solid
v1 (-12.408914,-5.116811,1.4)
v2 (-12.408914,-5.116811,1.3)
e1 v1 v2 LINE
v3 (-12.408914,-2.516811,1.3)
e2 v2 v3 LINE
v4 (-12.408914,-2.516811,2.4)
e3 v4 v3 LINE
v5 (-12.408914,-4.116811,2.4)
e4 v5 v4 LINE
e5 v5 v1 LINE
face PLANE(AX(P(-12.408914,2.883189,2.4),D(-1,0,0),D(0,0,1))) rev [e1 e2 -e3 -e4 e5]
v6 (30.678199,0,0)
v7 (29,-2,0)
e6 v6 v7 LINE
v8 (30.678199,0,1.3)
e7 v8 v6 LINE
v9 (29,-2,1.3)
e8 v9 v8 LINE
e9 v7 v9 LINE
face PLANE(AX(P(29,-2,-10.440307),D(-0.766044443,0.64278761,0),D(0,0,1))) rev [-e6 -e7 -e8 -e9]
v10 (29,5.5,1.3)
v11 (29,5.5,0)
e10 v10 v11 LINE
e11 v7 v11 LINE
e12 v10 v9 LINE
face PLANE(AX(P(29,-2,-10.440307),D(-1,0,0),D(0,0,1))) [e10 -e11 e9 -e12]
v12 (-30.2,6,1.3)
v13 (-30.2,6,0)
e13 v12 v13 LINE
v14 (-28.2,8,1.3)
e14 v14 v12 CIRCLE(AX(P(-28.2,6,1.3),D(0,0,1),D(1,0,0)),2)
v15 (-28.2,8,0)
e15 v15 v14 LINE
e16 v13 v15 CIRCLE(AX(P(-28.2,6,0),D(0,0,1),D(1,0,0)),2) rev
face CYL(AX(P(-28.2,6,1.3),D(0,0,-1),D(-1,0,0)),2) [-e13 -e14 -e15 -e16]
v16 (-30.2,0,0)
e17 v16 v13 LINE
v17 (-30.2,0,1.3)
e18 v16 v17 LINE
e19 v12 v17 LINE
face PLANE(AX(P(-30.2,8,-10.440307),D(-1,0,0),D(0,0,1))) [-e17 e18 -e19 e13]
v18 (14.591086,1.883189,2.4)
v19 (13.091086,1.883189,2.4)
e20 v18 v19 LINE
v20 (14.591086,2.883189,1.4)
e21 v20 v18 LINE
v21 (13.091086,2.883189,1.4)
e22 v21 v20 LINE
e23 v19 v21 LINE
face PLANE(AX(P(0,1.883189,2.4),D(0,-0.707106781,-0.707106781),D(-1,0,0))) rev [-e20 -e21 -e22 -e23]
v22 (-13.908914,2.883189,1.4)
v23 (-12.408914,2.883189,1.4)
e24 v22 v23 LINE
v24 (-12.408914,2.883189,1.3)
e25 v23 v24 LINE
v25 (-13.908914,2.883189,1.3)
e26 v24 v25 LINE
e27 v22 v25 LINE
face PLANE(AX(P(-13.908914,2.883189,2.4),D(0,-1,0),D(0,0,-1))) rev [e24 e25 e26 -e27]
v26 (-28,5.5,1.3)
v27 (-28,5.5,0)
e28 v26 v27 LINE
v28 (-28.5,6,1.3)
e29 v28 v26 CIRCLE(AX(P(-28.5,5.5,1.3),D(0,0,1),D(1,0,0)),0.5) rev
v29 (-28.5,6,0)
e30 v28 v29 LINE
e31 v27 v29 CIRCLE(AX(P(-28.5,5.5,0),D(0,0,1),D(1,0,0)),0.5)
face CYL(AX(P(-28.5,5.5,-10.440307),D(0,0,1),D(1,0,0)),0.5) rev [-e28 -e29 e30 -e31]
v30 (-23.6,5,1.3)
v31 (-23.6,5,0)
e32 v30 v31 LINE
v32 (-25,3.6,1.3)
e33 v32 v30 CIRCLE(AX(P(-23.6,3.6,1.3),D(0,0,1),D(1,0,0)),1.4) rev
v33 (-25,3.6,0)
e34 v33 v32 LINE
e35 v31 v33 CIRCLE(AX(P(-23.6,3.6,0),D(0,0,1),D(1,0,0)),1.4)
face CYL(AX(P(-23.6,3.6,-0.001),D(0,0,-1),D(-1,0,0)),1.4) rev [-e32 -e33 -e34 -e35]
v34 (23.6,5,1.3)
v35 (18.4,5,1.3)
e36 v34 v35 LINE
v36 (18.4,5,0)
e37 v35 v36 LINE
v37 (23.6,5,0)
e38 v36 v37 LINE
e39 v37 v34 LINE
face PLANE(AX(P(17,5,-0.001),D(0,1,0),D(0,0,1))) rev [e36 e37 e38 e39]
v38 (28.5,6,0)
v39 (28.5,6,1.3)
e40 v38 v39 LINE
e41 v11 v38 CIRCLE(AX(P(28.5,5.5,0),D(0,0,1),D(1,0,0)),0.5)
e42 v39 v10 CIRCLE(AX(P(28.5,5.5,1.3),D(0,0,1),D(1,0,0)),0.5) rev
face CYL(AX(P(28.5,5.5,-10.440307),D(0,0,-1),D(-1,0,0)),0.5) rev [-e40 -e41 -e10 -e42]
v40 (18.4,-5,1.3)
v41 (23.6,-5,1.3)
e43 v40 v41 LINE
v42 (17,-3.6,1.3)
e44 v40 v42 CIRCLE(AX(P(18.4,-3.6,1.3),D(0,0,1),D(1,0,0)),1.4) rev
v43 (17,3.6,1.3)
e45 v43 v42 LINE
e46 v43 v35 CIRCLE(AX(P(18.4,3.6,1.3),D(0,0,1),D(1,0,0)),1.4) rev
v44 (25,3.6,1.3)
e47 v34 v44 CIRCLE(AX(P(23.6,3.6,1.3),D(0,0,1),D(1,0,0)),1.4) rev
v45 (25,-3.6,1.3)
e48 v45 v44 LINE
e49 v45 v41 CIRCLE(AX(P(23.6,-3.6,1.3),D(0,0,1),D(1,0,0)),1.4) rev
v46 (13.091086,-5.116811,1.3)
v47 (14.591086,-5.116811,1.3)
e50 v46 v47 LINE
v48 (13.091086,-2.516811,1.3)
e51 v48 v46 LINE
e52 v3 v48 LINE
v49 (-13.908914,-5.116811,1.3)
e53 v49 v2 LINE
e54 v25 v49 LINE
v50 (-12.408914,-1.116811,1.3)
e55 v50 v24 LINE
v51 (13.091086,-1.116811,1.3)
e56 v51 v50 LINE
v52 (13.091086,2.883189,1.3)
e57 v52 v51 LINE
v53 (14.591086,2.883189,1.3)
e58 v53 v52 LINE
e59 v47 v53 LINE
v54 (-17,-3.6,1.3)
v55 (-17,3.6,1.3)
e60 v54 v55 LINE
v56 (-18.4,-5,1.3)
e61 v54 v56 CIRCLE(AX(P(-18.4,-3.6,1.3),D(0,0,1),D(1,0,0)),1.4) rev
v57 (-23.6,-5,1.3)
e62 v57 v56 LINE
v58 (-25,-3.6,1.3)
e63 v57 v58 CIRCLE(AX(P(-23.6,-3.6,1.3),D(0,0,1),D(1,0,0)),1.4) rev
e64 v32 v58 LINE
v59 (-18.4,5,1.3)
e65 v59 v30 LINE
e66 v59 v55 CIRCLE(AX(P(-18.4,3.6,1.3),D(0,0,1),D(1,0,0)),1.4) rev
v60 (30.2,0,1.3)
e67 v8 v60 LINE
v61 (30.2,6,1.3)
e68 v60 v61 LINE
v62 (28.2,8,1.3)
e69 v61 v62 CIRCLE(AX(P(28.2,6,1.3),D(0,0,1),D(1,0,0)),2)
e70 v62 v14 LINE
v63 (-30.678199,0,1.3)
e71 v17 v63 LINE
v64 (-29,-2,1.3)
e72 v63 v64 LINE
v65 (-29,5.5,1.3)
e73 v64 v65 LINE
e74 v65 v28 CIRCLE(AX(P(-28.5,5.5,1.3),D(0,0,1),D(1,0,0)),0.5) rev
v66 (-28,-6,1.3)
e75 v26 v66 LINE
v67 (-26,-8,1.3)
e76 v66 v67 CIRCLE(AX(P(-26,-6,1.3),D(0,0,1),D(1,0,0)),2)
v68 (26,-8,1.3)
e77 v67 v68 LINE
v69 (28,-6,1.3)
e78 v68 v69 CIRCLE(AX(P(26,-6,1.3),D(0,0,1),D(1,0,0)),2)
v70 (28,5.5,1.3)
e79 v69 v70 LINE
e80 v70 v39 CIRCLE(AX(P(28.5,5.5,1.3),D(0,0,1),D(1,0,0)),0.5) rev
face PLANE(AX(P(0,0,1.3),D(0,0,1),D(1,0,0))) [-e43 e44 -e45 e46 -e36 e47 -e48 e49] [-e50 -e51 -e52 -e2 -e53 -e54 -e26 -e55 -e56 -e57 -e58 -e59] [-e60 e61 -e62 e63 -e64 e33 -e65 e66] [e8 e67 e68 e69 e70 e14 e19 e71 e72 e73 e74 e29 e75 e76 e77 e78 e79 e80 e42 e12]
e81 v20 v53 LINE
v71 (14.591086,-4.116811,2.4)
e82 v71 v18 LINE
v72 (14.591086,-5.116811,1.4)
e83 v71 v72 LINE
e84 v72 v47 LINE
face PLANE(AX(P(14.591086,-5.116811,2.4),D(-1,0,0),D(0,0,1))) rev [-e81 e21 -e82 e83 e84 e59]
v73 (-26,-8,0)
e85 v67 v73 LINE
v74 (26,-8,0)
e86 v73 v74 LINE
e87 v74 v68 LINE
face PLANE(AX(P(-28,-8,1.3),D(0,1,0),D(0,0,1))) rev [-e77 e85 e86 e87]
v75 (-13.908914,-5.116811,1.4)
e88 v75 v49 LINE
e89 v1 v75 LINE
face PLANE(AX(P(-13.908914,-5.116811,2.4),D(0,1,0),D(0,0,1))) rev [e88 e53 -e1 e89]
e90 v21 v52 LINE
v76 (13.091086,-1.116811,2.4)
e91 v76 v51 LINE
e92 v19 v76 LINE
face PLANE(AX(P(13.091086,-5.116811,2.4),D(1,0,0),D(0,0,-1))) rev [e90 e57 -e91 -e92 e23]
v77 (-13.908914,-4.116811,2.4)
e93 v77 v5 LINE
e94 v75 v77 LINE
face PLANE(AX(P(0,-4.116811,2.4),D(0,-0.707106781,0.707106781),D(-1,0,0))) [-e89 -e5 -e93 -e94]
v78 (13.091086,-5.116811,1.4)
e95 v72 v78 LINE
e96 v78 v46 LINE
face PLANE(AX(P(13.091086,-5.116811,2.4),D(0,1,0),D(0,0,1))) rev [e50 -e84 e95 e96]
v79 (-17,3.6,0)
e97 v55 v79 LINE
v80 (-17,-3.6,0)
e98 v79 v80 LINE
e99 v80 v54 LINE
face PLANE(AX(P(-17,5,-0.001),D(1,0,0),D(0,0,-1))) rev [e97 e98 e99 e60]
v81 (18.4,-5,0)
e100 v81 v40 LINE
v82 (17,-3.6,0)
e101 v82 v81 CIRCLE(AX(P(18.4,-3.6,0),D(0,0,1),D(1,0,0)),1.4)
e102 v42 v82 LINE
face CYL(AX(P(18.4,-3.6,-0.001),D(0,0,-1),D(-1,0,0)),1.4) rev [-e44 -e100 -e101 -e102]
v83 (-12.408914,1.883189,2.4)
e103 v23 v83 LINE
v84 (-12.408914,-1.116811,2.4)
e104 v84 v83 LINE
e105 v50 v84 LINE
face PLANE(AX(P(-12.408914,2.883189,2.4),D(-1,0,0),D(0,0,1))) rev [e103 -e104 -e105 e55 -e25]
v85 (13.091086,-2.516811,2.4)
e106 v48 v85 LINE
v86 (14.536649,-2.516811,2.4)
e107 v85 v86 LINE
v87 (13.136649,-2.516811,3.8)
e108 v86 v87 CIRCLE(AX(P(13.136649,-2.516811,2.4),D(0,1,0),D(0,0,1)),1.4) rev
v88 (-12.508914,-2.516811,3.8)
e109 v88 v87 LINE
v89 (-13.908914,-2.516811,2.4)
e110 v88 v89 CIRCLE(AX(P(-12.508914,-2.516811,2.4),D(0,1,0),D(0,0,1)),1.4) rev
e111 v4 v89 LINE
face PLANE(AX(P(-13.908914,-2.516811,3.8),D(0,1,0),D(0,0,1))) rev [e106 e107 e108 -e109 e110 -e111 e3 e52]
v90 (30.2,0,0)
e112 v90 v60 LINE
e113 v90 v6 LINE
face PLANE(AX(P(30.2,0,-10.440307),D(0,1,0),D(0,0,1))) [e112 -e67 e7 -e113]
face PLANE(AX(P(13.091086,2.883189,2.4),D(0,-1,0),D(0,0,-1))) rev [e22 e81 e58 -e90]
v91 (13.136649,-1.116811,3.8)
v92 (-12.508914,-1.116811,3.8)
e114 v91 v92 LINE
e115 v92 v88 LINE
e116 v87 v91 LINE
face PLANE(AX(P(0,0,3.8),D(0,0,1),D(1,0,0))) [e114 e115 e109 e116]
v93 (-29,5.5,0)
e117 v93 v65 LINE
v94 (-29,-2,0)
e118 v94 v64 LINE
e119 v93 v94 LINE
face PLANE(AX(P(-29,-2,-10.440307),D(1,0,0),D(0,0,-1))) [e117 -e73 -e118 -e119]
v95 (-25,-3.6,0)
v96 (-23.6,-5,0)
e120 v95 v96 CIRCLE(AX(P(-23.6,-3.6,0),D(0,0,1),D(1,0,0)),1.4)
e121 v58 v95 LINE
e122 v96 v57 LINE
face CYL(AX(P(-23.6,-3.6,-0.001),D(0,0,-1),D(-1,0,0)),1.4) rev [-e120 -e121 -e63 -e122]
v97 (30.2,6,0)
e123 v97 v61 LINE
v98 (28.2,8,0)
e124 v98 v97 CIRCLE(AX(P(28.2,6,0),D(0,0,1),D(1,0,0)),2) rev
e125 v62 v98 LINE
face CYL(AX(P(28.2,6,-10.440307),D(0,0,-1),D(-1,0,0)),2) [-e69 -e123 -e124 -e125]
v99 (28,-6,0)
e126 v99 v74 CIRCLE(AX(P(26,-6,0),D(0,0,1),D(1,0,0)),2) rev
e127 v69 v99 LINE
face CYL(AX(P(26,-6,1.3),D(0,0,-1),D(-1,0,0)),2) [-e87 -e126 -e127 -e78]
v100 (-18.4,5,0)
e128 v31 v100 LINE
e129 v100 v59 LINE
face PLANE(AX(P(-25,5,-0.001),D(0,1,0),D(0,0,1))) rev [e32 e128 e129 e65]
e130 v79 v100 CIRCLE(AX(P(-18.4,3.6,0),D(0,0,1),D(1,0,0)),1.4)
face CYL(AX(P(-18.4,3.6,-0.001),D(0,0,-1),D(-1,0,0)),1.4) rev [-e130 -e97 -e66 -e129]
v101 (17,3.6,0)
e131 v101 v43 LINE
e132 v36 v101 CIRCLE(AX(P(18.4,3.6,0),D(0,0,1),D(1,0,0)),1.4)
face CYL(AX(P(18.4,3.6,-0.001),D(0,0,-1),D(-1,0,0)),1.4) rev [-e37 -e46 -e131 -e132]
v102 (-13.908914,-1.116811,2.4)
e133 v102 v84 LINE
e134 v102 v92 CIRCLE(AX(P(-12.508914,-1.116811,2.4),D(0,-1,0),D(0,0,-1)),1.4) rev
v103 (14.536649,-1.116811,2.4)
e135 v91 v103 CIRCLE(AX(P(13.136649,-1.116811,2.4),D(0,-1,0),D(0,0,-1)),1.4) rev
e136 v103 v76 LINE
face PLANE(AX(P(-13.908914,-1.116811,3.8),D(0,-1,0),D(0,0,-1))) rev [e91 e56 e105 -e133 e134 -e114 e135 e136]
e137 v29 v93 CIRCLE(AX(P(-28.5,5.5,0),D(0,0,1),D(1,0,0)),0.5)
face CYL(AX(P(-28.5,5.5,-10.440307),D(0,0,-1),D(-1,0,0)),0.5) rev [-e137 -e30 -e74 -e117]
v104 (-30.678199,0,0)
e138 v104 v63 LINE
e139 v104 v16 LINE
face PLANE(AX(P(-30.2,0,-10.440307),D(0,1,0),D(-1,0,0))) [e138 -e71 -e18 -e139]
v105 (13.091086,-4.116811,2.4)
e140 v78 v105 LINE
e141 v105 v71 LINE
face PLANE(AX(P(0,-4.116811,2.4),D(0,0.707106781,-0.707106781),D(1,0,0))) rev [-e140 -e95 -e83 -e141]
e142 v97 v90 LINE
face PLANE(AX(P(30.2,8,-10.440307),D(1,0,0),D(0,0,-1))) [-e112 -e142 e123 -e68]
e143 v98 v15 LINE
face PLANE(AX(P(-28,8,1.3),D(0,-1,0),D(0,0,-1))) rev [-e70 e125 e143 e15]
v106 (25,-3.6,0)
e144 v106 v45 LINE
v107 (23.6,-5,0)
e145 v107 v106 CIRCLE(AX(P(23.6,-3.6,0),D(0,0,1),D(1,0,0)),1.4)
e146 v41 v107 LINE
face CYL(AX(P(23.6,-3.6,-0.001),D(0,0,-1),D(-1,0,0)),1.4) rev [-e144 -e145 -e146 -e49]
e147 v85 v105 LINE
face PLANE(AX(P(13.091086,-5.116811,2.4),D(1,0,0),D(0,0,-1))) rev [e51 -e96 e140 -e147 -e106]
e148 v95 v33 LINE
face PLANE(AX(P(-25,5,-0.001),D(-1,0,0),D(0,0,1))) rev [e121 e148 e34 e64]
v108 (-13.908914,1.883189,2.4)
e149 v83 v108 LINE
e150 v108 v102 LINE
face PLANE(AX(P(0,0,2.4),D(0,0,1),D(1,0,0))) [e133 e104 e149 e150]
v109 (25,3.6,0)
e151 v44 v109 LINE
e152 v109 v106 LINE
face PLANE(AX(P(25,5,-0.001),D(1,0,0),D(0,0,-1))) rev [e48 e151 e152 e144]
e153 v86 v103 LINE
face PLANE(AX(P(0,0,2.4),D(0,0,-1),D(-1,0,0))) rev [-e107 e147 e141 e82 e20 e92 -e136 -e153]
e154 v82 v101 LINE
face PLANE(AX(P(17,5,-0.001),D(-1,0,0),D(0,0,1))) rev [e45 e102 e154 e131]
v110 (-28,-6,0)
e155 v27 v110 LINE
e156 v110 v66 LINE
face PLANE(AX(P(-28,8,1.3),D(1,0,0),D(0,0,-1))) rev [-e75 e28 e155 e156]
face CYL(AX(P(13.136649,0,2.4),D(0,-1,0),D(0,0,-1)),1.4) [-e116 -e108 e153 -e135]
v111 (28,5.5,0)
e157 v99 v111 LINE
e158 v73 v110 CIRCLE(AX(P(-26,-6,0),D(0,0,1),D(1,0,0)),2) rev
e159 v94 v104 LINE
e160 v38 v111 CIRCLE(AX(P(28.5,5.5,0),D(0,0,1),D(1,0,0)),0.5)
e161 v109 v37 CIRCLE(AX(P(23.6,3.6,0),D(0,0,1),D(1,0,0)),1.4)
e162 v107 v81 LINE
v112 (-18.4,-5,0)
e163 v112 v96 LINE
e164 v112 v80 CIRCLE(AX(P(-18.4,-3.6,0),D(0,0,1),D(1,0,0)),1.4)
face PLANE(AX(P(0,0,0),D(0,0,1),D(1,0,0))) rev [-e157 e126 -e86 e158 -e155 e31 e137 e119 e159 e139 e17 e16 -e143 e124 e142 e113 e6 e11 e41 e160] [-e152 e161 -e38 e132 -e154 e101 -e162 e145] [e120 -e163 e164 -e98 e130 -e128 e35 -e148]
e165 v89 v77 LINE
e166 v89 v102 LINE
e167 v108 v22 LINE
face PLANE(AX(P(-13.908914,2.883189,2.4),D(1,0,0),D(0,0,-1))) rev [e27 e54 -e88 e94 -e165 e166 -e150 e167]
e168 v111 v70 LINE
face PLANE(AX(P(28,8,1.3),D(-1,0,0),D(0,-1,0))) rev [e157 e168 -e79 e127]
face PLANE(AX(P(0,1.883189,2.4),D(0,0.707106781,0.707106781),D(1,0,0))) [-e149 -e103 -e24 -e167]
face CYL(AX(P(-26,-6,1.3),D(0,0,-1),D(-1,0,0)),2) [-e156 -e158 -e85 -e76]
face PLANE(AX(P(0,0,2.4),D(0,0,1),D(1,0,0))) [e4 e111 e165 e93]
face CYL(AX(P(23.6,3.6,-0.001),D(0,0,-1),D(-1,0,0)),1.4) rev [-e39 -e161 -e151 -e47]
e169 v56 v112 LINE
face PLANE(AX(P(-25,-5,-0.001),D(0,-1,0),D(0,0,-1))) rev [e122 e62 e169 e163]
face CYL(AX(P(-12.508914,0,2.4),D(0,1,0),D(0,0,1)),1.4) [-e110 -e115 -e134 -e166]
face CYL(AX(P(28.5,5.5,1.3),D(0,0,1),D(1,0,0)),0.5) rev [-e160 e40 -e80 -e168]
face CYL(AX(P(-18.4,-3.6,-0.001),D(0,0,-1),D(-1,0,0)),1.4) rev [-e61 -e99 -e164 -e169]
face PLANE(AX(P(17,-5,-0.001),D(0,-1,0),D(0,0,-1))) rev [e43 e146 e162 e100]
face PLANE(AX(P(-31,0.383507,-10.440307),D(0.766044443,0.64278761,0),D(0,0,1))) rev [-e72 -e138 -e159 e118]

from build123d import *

# Parameters (mm, degrees)
SKETCH_1_W          = 56
SKETCH_1_H          = 16
EXTRUDE_1_DEPTH     = 1.3
EXTRUDE_2_DEPTH     = 1.3
FILLET_1_R          = 2
FILLET_2_R          = 0.5
CHAMFER_1_SIZE      = 2
CHAMFER_1_SIZE_2    = 2.383507185
CHAMFER_2_SIZE      = 2.383507185
CHAMFER_2_SIZE_2    = 2
SKETCH_3_W          = 1.5
SKETCH_3_H          = 8
EXTRUDE_3_DEPTH     = 1.1
CHAMFER_3_SIZE      = 1
SKETCH_4_W          = 28.445563285
SKETCH_4_H          = 1.4
EXTRUDE_4_DEPTH     = 2.5
FILLET_3_R          = 1.4
CUT_EXTRUDE_1_REACH = 33.803
SKETCH_6_W          = 8
SKETCH_6_H          = 10
FILLET_4_R          = 1.4


# Some blends are built 0.0001 mm under size
with BuildPart() as part:
    # 草图1 → 凸台-拉伸1 (new body)
    with BuildSketch(Plane.XY):
        Rectangle(SKETCH_1_W, SKETCH_1_H)
    extrude(amount=EXTRUDE_1_DEPTH)

    # 草图2 → 凸台-拉伸2 (add)
    with BuildSketch(Plane.XY.offset(1.3)):
        Polygon((28, 8), (30.2, 8), (30.2, 0), (31, 0), (31, -2), (29, -2), (29, 6), (28, 6), align=None)
        Polygon((-28, 8), (-30.2, 8), (-30.2, 0), (-31, 0), (-31, -2), (-29, -2), (-29, 6), (-28, 6), align=None)
    extrude(amount=-EXTRUDE_2_DEPTH)

    # 圆角1
    fillet_1_edges = [part.edges().sort_by_distance(p)[0] for p in [
        (-30.2, 8, 0.65),
        (30.2, 8, 0.65),
        (28, -8, 0.65),
        (-28, -8, 0.65),
    ]]
    fillet(fillet_1_edges, radius=FILLET_1_R)

    # 圆角2
    fillet_2_edges = [part.edges().sort_by_distance(p)[0] for p in [
        (28, 6, 0.65),
        (29, 6, 0.65),
        (-28, 6, 0.65),
        (-29, 6, 0.65),
    ]]
    fillet(fillet_2_edges, radius=FILLET_2_R - 0.0001)  # a hair under: the kernel refuses the full size

    # 倒角1
    # the kernel refuses this chamfer: 2.383507185, 2 mm, written as the material it takes off along each edge
    with BuildSketch(Plane(origin=(31, -2, 7.443265966), x_dir=(-0.9993728857116145, -0.03540953691366299, 0), z_dir=(0, 0, -1))) as chamfer_1_piece_1:
        Polygon((CHAMFER_1_SIZE * 0.999372885712, CHAMFER_1_SIZE * 0.0354095369137), (-CHAMFER_1_SIZE_2 * 0.0354095369165, CHAMFER_1_SIZE_2 * 0.999372885791), (0, 0), align=None)
    extrude(amount=13.586531933, mode=Mode.SUBTRACT)

    # 倒角2
    # the kernel refuses this chamfer: 2.383507185, 2 mm, written as the material it takes off along each edge
    with BuildSketch(Plane(origin=(-31, -2, 7.443265966), x_dir=(-0.024939322090233737, 0.9996889667359941, 0), z_dir=(0, 0, -1))) as chamfer_2_piece_1:
        Polygon((CHAMFER_2_SIZE * 0.999688966815, CHAMFER_2_SIZE * 0.0249393220922), (-CHAMFER_2_SIZE_2 * 0.0249393220902, CHAMFER_2_SIZE_2 * 0.999688966736), (0, 0), align=None)
    extrude(amount=13.586531933, mode=Mode.SUBTRACT)

    # 草图3 → 凸台-拉伸3 (add)
    with BuildSketch(Plane.XY.offset(1.3)):
        with Locations((-13.15891381, -1.11681071)):
            Rectangle(SKETCH_3_W, SKETCH_3_H)
        with Locations((13.84108619, -1.11681071)):
            Rectangle(SKETCH_3_W, SKETCH_3_H)
    extrude(amount=EXTRUDE_3_DEPTH)

    # 倒角3
    chamfer_3_edges = [part.edges().sort_by_distance(p)[0] for p in [
        (-13.15891381, -5.11681071, 2.4),
        (-13.15891381, 2.88318929, 2.4),
        (13.84108619, -5.11681071, 2.4),
        (13.84108619, 2.88318929, 2.4),
    ]]
    chamfer(chamfer_3_edges, length=CHAMFER_3_SIZE)

    # 草图4 → 凸台-拉伸4 (add)
    with BuildSketch(Plane.XY.offset(1.3)):
        with Locations((0.313867832, -1.81681071)):
            Rectangle(SKETCH_4_W, SKETCH_4_H)
    extrude(amount=EXTRUDE_4_DEPTH)

    # 圆角3
    fillet_3_edges = [part.edges().sort_by_distance(p)[0] for p in [
        (14.536649475, -1.81681071, 3.8),
        (-13.90891381, -1.81681071, 3.8),
    ]]
    fillet(fillet_3_edges, radius=FILLET_3_R - 0.0001)  # a hair under: the kernel refuses the full size

    # 草图6 → 切除-拉伸1 (cut, up to next)
    with BuildSketch(Plane.XY.offset(1.3), mode=Mode.PRIVATE) as cut_extrude_1_sk1:
        with Locations((-21, 0)):
            Rectangle(SKETCH_6_W, SKETCH_6_H)
    cut_extrude_1_tool1 = extrude(cut_extrude_1_sk1.sketch, amount=-CUT_EXTRUDE_1_REACH, mode=Mode.PRIVATE) & part.part
    # 草图6 → 切除-拉伸1 (cut, up to next)
    with BuildSketch(Plane.XY.offset(1.3), mode=Mode.PRIVATE) as cut_extrude_1_sk2:
        with Locations((21, 0)):
            Rectangle(SKETCH_6_W, SKETCH_6_H)
    cut_extrude_1_tool2 = extrude(cut_extrude_1_sk2.sketch, amount=-CUT_EXTRUDE_1_REACH, mode=Mode.PRIVATE) & part.part
    add(cut_extrude_1_tool1.solids().sort_by_distance((-21, 0, 1.3))[0], mode=Mode.SUBTRACT)
    add(cut_extrude_1_tool2.solids().sort_by_distance((21, 0, 1.3))[0], mode=Mode.SUBTRACT)

    # 圆角4
    fillet_4_edges = [part.edges().sort_by_distance(p)[0] for p in [
        (-17, 5, 0.65),
        (-17, -5, 0.65),
        (-25, -5, 0.65),
        (-25, 5, 0.65),
        (25, 5, 0.65),
        (25, -5, 0.65),
        (17, -5, 0.65),
        (17, 5, 0.65),
    ]]
    fillet(fillet_4_edges, radius=FILLET_4_R)


solid = part.part
